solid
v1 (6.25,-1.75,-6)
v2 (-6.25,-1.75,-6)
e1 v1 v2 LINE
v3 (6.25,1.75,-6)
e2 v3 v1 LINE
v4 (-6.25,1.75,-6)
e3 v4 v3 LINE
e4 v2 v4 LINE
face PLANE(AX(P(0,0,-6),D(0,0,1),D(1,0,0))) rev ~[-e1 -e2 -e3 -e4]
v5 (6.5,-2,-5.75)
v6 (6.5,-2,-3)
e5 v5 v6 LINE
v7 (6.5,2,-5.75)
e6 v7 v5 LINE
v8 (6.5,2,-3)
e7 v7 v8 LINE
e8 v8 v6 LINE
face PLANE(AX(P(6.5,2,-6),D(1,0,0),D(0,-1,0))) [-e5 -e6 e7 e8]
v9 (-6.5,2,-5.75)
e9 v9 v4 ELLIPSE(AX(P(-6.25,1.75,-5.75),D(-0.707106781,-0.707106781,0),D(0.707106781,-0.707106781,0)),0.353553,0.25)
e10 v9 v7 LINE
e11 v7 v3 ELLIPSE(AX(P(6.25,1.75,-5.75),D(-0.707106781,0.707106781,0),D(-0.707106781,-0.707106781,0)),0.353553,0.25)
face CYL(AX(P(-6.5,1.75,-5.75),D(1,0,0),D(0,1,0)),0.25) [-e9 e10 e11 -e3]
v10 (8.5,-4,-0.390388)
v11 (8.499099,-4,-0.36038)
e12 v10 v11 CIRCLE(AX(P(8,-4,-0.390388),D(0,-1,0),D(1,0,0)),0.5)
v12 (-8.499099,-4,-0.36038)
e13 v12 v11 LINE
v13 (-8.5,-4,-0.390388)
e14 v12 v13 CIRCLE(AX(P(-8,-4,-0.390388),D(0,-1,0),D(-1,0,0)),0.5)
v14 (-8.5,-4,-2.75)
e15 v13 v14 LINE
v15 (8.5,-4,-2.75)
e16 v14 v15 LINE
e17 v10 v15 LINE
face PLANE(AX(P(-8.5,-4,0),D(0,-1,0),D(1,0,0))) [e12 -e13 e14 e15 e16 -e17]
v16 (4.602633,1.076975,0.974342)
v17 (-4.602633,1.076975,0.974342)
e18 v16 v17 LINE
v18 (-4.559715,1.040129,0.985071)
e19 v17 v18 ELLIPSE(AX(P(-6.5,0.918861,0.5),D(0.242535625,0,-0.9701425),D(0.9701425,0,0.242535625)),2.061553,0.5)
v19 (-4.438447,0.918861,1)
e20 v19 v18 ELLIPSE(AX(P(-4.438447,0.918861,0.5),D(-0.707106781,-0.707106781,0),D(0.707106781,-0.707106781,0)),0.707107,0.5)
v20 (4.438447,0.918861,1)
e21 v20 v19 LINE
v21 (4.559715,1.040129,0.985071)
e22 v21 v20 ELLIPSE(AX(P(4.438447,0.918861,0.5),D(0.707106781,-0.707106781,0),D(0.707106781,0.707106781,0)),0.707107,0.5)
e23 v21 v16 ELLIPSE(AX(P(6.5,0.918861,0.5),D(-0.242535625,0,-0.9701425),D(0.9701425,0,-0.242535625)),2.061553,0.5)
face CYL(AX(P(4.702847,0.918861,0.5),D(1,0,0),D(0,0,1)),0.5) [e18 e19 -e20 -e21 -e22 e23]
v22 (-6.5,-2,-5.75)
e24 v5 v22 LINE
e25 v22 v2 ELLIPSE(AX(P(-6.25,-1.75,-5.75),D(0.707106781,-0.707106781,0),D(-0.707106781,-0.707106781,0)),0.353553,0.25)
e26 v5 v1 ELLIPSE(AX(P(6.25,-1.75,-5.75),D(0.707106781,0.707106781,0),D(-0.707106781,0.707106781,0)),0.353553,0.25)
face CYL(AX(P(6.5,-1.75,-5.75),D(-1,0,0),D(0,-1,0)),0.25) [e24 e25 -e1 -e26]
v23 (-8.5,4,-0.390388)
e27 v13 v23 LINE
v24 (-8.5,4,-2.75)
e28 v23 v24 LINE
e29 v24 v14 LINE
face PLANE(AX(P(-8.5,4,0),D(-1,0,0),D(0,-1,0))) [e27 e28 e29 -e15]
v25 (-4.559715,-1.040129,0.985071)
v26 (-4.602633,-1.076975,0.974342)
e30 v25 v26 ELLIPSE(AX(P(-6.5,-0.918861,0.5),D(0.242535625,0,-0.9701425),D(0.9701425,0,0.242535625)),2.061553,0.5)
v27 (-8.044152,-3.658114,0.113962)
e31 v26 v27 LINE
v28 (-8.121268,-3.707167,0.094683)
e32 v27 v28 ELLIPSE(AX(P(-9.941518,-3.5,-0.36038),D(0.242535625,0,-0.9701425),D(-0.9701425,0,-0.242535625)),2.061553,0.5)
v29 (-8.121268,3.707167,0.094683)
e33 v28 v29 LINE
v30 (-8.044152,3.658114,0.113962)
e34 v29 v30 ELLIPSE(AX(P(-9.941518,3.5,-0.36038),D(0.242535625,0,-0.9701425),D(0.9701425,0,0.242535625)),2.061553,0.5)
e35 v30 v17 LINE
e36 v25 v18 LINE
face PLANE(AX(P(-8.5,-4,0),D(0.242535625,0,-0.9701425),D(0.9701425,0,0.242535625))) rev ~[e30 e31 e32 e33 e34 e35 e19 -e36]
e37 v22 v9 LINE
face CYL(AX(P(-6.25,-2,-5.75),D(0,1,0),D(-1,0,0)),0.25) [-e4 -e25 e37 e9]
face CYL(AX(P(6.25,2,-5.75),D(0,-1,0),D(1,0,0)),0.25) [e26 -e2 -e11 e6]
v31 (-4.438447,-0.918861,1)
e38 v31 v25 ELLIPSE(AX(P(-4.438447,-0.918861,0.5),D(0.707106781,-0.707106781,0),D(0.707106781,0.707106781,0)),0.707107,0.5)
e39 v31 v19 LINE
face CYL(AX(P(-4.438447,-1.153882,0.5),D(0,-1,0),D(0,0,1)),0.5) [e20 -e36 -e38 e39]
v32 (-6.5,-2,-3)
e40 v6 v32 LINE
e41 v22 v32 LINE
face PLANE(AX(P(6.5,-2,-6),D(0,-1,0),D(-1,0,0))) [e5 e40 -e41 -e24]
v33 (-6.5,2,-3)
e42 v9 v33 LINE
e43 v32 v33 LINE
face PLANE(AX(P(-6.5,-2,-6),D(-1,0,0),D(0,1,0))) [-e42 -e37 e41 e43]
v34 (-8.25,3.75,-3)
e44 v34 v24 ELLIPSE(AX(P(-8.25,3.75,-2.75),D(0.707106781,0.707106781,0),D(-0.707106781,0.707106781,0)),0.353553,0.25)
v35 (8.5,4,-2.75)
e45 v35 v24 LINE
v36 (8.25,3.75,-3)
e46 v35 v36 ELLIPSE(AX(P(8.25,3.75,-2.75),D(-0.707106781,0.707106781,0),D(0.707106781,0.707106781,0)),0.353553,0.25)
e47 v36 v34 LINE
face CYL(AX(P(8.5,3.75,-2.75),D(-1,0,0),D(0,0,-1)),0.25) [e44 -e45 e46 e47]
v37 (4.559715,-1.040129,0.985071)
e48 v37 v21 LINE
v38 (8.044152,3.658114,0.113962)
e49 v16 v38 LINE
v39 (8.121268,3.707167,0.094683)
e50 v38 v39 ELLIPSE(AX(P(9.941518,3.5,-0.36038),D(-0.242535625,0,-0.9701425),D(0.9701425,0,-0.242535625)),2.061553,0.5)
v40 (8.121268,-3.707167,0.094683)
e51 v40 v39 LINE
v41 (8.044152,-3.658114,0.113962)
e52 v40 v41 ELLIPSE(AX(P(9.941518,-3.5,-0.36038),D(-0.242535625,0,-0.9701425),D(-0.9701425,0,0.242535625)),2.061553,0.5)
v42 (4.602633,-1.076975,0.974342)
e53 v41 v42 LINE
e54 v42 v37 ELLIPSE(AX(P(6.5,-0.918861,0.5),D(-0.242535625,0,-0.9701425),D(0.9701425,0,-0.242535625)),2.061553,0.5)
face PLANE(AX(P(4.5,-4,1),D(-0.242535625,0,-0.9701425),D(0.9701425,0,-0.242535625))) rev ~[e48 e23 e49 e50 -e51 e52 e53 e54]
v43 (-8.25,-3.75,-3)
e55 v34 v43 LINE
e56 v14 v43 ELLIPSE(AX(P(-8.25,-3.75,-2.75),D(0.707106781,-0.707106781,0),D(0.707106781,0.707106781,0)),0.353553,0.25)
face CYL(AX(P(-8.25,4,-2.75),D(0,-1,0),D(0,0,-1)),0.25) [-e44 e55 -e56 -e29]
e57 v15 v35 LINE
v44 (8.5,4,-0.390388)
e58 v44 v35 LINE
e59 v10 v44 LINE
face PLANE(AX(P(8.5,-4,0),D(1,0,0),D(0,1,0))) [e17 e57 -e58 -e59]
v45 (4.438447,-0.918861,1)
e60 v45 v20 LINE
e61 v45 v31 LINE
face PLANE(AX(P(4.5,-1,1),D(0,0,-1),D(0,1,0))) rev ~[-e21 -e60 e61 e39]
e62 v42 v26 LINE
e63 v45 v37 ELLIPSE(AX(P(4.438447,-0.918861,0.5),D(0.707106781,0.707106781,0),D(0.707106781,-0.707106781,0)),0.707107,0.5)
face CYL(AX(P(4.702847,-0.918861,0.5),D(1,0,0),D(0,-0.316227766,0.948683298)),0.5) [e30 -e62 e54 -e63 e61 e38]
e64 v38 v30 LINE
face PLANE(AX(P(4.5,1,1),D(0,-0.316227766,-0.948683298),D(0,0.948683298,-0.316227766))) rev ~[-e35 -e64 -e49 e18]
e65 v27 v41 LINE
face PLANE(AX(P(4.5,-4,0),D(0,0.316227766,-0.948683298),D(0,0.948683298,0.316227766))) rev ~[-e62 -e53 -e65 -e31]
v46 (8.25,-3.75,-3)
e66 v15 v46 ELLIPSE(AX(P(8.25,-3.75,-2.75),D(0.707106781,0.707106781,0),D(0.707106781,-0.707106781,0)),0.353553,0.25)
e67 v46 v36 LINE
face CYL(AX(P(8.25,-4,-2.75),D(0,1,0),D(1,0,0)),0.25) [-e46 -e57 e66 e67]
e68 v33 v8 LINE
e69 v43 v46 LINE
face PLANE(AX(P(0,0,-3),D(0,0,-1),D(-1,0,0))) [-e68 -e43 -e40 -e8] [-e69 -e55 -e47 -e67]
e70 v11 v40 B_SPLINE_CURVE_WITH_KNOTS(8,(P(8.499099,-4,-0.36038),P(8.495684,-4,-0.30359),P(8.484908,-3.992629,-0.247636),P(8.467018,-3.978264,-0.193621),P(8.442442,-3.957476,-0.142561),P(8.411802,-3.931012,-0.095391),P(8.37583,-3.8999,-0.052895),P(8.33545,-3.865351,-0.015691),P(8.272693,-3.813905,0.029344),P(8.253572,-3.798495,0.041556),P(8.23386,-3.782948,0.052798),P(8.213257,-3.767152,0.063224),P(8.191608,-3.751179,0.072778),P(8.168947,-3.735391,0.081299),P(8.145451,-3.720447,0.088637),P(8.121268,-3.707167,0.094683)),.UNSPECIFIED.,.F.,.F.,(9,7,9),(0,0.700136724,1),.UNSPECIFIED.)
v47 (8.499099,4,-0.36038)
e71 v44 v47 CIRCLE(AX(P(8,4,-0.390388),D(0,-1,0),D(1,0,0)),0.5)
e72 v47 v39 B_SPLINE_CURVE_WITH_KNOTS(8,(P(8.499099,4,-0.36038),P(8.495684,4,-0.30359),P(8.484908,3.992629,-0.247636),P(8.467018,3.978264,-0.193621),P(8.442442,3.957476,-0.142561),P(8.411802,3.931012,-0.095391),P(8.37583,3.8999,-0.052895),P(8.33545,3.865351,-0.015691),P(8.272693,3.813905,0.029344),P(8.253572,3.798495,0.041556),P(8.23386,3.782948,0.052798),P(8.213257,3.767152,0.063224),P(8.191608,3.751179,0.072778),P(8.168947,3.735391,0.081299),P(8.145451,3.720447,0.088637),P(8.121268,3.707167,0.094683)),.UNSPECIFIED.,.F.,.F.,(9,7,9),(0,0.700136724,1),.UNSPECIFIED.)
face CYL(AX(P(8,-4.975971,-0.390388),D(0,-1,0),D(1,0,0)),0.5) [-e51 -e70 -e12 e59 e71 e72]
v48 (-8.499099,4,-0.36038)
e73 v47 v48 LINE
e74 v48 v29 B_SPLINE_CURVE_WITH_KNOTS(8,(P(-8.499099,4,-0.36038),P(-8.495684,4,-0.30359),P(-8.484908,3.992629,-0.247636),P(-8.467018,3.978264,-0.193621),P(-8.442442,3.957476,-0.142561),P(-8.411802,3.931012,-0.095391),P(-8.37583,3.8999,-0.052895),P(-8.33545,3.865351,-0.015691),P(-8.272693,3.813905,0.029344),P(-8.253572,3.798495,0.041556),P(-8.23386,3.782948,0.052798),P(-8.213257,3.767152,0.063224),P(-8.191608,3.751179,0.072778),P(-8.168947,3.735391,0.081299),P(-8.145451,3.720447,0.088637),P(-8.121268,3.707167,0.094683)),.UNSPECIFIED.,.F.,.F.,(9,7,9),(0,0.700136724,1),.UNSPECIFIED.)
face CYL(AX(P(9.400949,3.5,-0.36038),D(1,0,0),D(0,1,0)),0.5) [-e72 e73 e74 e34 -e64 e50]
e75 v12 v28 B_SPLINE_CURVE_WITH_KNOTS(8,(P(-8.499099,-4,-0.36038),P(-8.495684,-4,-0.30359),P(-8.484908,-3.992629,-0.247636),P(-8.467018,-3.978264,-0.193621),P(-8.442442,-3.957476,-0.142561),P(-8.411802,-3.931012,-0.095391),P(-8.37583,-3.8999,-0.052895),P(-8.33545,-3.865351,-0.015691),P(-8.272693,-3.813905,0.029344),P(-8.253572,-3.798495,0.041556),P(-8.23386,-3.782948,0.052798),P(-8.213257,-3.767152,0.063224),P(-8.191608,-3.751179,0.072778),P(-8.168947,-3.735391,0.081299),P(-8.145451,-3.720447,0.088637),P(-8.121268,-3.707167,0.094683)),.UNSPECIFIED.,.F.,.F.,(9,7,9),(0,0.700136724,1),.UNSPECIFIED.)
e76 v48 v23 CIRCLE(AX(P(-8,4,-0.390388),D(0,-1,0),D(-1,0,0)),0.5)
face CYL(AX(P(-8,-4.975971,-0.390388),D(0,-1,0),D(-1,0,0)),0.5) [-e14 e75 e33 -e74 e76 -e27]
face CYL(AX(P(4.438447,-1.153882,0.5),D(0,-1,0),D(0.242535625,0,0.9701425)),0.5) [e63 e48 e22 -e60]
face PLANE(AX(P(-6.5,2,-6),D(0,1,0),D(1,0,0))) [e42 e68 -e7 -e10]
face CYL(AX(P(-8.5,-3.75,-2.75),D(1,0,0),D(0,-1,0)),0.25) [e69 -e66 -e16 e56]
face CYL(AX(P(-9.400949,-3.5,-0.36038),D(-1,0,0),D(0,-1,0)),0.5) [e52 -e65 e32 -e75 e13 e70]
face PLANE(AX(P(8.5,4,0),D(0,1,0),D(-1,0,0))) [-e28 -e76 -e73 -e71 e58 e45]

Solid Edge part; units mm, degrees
sketch "Sketch1" plane through (0, 0, 0) normal (0, 0, 1) x (1, 0, 0)
  line L0 (-8.5, -4) -> (8.5, -4)
  line L1 (8.5, -4) -> (8.5, 4)
  line L2 (8.5, 4) -> (-8.5, 4)
  line L3 (-8.5, 4) -> (-8.5, -4)
  dimension "D1" = 17
  dimension "D2" = 8
extrude "Protrusion1" add sketch "Sketch1" against normal blind 6
sketch "Sketch2" plane through (0, 0, -6) normal (0, 0, -1) x (1, 0, 0)
  line L0 (-6.5, -2) -> (6.5, -2)
  line L1 (6.5, -2) -> (6.5, 2)
  line L2 (6.5, 2) -> (-6.5, 2)
  line L3 (-6.5, 2) -> (-6.5, -2)
  dimension "D1" = 13
  dimension "D2" = 4
extrude "Extrusionsausschnitt_1" cut sketch "Sketch2" against normal blind 3 flip side to cut
fillet "Verrundung_1" radius 0.25 8 edges at (0, -2, -6) (6.5, 0, -6) (0, 2, -6) (-6.5, 0, -6) (0, -4, -3) (8.5, 0, -3) (0, 4, -3) (-8.5, 0, -3)
sketch "Sketch3" plane through (0, 0, 0) normal (0, 0, 1) x (1, 0, 0)
  line L0 (-4.5, -1) -> (4.5, -1)
  line L1 (4.5, -1) -> (4.5, 1)
  line L2 (4.5, 1) -> (-4.5, 1)
  line L3 (-4.5, 1) -> (-4.5, -1)
  dimension "D1" = 9
  dimension "D2" = 2
extrude "Extrusionsausprägung_2" add sketch "Sketch3" along normal blind 1
sketch "Sketch4" plane through (4.5, 0, 0.5) normal (1, 0, 0) x (0, 1, 0)
  line L0 (-4, -0.5) -> (-1, 0.5)
  line L1 (-4, -0.5) -> (4, -0.5)
  line L2 (1, 0.5) -> (4, -0.5)
  line L3 (-1, 0.5) -> (1, 0.5)
extrude "Extrusionsausprägung_3" add sketch "Sketch4" against normal blind 13 and the other way blind 4
sketch "Sketch5" plane through (0, -4, -1.375) normal (0, -1, 0) x (1, 0, 0)
  line L0 (-8.5, 1.375) -> (-4.5, 2.375)
  line L1 (-4.5, 2.375) -> (4.5, 2.375)
  line L2 (4.5, 2.375) -> (8.5, 1.375)
  dimension "D1" = 9
extrude "Extrusionsausschnitt_2" cut sketch "Sketch5" against normal blind 10 material side at (-6.5121, -4, 0.5485)
fillet "Verrundung_4" radius 0.5 8 edges at (0, -1, 1) (-4.5, 0, 1) (0, 1, 1) (4.5, 0, 1) (0, -4, 0) (8.5, 0, 0) (0, 4, 0) (-8.5, 0, 0)
properties part number "053" material "PLA"
